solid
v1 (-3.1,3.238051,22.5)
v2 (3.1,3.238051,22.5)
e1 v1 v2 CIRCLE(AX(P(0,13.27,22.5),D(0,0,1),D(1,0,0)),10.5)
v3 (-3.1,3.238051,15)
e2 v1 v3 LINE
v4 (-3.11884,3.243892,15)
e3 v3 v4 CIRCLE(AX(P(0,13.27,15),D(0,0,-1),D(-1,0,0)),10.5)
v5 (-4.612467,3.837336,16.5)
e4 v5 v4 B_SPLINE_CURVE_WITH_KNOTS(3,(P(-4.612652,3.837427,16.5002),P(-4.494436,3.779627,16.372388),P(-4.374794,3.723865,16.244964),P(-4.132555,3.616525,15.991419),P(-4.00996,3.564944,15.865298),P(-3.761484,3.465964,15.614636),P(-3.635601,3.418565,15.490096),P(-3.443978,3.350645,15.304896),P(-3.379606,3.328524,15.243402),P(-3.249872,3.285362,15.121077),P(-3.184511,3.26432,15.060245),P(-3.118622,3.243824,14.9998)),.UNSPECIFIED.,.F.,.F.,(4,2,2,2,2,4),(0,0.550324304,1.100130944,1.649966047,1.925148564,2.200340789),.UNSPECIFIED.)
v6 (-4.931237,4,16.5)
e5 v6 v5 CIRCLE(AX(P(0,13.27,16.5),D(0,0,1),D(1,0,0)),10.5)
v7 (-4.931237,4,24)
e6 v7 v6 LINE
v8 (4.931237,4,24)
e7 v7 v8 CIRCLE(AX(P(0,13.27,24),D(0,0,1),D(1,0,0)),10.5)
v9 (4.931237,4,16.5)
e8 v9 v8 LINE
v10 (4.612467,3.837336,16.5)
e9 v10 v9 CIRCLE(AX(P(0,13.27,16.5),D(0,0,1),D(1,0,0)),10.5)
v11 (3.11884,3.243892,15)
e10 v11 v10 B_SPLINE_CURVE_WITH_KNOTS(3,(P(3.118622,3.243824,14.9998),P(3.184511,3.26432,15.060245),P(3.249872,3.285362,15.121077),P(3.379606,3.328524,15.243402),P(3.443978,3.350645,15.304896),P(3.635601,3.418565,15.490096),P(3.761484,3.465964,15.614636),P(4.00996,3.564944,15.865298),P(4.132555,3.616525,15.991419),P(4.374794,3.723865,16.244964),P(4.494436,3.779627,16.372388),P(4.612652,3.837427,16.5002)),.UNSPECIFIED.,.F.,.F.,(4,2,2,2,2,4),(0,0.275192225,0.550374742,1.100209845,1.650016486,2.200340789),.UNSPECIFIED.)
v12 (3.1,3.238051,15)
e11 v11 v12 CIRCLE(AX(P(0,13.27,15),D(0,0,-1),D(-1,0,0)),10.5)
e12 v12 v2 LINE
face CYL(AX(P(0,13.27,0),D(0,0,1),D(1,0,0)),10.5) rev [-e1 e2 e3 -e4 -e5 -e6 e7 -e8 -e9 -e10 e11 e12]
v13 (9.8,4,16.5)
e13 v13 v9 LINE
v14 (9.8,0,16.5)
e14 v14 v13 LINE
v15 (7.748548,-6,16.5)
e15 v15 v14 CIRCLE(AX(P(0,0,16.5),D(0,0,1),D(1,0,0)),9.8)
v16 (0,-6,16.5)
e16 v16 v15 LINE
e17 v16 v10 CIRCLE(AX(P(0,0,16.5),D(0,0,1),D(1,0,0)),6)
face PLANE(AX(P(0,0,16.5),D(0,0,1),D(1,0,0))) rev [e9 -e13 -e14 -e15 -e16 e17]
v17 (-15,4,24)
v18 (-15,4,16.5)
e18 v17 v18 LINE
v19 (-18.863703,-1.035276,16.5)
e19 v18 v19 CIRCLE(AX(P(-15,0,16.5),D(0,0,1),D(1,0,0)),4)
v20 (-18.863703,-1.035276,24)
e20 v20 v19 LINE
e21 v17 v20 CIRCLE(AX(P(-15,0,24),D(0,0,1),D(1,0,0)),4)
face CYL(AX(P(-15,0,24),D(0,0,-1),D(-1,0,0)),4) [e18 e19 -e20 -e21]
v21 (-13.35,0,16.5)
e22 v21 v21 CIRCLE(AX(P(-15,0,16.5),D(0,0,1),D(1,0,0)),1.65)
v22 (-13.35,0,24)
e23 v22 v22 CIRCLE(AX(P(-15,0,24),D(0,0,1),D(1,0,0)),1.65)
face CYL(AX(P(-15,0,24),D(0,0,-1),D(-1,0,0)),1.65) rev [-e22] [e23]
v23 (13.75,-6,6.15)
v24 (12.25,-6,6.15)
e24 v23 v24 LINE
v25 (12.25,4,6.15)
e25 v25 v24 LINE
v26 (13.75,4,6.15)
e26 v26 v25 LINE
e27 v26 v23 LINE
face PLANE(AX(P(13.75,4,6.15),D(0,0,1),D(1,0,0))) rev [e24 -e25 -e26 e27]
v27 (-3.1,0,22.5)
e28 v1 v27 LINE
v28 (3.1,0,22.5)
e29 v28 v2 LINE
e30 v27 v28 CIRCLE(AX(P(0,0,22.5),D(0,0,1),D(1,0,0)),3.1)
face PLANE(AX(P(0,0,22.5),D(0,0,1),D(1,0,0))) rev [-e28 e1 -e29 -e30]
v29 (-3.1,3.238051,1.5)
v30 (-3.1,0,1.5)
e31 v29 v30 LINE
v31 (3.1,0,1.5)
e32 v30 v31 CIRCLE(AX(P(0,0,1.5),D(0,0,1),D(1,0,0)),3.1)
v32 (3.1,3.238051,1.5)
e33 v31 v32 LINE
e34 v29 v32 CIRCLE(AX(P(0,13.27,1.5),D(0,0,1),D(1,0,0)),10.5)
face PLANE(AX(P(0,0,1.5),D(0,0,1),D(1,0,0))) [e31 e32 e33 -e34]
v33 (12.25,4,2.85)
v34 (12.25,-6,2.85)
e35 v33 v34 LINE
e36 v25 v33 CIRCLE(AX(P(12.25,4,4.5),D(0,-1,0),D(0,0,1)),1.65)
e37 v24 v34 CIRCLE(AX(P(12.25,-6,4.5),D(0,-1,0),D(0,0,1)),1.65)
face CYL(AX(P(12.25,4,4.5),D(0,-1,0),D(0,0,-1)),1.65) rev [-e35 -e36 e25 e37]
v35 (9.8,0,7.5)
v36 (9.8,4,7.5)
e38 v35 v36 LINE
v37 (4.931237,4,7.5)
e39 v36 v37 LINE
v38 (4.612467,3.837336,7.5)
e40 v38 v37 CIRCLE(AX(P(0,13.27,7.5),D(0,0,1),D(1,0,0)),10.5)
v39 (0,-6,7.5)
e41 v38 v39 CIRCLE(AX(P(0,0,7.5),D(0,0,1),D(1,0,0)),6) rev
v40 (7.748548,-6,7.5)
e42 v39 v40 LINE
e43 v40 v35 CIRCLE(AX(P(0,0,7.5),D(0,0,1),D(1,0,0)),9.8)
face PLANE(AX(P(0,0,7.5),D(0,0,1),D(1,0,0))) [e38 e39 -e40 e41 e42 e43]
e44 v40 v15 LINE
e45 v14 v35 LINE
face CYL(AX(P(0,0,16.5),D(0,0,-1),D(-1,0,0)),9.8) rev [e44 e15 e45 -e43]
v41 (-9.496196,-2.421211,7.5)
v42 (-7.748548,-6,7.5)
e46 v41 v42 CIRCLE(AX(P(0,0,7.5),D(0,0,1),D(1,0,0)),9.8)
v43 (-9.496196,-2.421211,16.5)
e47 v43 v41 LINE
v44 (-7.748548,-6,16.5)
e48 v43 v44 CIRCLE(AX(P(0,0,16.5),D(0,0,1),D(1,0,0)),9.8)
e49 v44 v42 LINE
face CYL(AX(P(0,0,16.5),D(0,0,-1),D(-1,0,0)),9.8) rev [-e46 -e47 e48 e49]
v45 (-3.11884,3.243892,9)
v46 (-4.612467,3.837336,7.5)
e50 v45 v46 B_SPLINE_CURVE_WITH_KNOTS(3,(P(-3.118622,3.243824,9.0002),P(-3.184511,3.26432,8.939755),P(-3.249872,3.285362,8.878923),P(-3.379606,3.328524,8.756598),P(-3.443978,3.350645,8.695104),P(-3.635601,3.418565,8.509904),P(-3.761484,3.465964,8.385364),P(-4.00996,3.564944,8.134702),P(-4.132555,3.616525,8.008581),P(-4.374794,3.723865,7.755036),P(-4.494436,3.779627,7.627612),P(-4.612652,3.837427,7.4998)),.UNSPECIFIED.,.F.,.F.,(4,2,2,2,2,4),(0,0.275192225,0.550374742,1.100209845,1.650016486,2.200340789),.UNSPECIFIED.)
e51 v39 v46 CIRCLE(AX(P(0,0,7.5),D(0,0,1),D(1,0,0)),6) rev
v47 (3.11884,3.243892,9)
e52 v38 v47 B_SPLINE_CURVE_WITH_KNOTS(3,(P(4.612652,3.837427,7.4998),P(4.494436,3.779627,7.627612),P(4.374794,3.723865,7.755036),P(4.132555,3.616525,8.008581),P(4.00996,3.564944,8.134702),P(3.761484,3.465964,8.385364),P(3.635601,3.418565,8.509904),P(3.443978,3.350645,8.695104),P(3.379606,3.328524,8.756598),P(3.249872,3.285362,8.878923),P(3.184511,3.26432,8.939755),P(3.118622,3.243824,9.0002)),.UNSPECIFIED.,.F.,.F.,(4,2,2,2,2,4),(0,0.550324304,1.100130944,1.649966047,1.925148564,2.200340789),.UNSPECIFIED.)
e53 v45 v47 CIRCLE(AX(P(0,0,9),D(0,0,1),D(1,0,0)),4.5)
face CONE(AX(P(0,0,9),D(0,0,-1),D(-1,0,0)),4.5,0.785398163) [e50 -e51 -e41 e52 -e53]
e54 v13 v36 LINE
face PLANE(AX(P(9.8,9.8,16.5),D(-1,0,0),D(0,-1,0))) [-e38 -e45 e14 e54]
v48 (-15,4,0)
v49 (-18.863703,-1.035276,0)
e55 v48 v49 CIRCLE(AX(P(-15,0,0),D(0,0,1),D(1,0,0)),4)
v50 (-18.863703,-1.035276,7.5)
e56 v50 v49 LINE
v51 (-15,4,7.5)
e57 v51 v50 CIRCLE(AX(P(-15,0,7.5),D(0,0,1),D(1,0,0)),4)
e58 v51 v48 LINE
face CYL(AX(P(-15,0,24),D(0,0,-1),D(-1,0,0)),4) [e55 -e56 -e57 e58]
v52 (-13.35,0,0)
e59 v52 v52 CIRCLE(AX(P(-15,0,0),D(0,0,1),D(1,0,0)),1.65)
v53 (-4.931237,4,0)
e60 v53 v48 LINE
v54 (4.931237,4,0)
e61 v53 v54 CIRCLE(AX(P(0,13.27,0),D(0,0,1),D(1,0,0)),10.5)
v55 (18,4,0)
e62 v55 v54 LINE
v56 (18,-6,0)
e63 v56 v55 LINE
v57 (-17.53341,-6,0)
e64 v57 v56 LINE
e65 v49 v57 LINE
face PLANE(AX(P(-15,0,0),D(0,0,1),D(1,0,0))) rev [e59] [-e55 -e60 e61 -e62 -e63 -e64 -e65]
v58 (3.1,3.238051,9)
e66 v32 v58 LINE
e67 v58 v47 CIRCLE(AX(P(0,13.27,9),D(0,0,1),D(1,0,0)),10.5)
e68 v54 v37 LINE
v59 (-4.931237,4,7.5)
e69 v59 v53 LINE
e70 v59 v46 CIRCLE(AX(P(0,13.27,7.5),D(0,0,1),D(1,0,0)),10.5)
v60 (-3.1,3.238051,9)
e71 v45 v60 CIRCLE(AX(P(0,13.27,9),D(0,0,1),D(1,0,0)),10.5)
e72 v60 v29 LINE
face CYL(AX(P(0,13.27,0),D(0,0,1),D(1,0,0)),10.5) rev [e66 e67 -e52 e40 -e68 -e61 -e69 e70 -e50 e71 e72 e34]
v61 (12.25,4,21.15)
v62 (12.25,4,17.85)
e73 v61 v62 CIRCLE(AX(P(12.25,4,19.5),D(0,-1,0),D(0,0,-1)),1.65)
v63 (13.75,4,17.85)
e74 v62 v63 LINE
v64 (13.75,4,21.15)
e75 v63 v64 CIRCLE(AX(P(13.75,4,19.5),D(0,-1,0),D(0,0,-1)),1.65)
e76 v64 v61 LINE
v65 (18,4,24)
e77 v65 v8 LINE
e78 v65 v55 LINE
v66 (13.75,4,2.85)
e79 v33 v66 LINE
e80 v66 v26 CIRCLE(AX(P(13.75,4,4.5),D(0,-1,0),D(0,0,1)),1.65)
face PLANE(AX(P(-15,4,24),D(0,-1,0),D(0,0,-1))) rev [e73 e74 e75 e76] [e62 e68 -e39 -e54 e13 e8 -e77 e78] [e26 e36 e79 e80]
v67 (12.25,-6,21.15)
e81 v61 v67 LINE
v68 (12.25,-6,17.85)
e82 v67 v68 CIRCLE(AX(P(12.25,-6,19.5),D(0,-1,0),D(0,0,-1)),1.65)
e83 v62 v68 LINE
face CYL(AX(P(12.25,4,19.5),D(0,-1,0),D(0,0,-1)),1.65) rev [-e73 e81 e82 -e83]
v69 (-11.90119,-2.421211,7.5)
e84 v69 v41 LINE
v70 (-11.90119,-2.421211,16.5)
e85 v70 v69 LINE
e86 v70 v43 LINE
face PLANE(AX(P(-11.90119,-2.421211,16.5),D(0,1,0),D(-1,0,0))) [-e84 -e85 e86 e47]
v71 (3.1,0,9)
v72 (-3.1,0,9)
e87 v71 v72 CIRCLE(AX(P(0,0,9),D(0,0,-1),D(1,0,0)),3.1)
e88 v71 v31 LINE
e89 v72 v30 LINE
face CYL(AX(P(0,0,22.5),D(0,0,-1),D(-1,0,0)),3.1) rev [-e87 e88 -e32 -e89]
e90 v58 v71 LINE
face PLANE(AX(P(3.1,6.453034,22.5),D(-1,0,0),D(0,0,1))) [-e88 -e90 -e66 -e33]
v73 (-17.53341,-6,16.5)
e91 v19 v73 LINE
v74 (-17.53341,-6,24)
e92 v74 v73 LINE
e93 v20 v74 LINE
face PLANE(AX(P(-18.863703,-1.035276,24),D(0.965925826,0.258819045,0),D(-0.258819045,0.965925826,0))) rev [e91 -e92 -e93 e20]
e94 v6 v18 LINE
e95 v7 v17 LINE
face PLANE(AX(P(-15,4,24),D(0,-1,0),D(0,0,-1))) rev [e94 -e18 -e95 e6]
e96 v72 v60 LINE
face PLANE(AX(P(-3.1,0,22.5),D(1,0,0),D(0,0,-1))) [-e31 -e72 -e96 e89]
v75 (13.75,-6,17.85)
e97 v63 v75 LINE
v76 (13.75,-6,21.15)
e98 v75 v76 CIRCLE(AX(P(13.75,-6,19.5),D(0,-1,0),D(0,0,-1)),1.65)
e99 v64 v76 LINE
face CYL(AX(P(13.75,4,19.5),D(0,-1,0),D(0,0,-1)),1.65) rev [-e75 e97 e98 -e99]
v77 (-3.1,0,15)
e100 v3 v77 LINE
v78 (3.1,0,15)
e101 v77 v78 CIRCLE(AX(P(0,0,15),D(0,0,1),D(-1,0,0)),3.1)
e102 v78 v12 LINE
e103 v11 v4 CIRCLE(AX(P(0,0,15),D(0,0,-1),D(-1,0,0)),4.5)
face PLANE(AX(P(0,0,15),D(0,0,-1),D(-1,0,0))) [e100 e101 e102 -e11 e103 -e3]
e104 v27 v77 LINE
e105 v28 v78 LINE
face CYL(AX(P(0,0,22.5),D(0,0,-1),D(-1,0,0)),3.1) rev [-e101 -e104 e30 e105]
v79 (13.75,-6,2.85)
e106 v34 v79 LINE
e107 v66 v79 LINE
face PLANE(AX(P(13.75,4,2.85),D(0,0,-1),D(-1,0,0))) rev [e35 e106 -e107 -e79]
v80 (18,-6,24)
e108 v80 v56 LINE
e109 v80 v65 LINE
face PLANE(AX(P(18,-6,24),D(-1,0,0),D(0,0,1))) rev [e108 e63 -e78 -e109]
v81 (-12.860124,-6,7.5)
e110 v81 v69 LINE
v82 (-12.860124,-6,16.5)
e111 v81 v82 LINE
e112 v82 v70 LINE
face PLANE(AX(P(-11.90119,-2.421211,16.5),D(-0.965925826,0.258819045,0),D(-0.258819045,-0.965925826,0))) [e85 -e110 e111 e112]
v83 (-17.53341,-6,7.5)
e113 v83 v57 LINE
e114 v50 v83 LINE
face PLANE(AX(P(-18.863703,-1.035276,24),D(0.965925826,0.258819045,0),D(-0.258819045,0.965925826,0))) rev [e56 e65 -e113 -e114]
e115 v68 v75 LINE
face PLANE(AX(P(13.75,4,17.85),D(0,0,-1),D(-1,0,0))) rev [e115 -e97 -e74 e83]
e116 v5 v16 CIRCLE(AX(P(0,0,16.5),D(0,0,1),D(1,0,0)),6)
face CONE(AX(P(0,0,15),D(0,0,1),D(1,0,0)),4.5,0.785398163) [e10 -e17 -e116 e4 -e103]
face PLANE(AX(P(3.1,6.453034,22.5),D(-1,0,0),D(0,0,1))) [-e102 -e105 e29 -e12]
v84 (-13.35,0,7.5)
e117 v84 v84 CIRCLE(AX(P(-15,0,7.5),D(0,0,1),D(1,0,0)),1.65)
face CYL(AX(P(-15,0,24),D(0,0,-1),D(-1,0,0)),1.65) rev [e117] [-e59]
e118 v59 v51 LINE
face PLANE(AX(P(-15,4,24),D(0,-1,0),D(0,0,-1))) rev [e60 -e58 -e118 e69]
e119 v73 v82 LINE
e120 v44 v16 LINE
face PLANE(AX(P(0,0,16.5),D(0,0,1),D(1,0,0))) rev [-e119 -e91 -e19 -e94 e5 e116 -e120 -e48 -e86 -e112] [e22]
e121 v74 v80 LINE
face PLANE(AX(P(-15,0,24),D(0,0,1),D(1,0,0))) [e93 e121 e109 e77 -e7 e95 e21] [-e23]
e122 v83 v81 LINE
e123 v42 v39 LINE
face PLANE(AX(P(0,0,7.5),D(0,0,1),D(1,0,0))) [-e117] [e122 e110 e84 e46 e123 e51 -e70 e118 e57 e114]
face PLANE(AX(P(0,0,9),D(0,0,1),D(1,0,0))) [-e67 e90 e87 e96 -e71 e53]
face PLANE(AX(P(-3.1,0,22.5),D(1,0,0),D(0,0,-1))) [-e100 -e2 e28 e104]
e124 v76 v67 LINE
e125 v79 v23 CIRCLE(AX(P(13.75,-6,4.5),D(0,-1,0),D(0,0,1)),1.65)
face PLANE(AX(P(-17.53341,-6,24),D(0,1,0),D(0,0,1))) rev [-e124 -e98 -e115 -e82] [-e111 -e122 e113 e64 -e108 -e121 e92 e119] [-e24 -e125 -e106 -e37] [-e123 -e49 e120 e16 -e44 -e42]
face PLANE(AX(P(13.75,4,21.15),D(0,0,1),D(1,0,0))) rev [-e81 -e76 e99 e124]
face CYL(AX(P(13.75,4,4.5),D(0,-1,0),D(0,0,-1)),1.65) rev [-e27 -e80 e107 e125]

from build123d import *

# Parameters (mm, degrees)
SKETCH1_R               = 1.65
BOSS_EXTRUDE1_DEPTH     = 24
CUT_EXTRUDE1_DEPTH      = 4.5
CUT_EXTRUDE1_DEPTH_BACK = 4.5
CUT_EXTRUDE3_DEPTH      = 10.5
CUT_EXTRUDE3_DEPTH_BACK = 10.5
CUT_EXTRUDE2_DEPTH      = 33.202484376
BOSS_EXTRUDE2_DEPTH     = 1.5
BOSS_EXTRUDE3_START     = 1.5
BOSS_EXTRUDE3_DEPTH     = 1.5
CHAMFER1_SIZE           = 1.5
SKETCH7_R               = 10.5
CUT_EXTRUDE4_DEPTH      = 32.192947921


with BuildPart() as part:
    # Sketch1 → Boss-Extrude1 (new body)
    with BuildSketch(Plane.XY):
        with BuildLine():
            Line((-18.863703305, -1.03527618), (-17.533409567, -6))
            Line((-17.533409567, -6), (18, -6))
            Line((18, -6), (18, 4))
            Line((18, 4), (-15, 4))
            ThreePointArc((-15, 4), (-18.173413361, 2.435045716), (-18.863703305, -1.03527618))
        make_face()
        with Locations((-15, 0)):
            Circle(SKETCH1_R, mode=Mode.SUBTRACT)
    extrude(amount=BOSS_EXTRUDE1_DEPTH)

    # Sketch2 → Cut-Extrude1 (cut, two sides: drawn at the far end of the back side and taken through both)
    with BuildSketch(Plane.XY.offset(12).offset(-CUT_EXTRUDE1_DEPTH_BACK)):
        with BuildLine():
            Line((-11.901189968, -2.421210935), (-19.809111658, -31.933976465))
            Line((-19.809111658, -31.933976465), (-19.809111658, 9.8))
            Line((-19.809111658, 9.8), (9.8, 9.8))
            Line((9.8, 9.8), (9.8, 0))
            ThreePointArc((9.8, 0), (1.220098284, -9.723752371), (-9.496195955, -2.421210935))
            Line((-9.496195955, -2.421210935), (-11.901189968, -2.421210935))
        make_face()
    extrude(amount=CUT_EXTRUDE1_DEPTH + CUT_EXTRUDE1_DEPTH_BACK, mode=Mode.SUBTRACT)

    # Sketch4 → Cut-Extrude3 (cut, two sides: drawn at the far end of the back side and taken through both)
    with BuildSketch(Plane.XY.offset(12).offset(-CUT_EXTRUDE3_DEPTH_BACK)):
        with BuildLine():
            Line((-3.1, 0), (-3.1, 6.453034263))
            Line((-3.1, 6.453034263), (3.1, 6.453034263))
            Line((3.1, 6.453034263), (3.1, 0))
            ThreePointArc((3.1, 0), (0, -3.1), (-3.1, 0))
        make_face()
    extrude(amount=CUT_EXTRUDE3_DEPTH + CUT_EXTRUDE3_DEPTH_BACK, mode=Mode.SUBTRACT)

    # Sketch3 → Cut-Extrude2 (cut, through all)
    with BuildSketch(Plane.XZ.offset(6)):
        with BuildLine():
            Line((13.75, 17.85), (12.25, 17.85))
            ThreePointArc((12.25, 17.85), (10.6, 19.5), (12.25, 21.15))
            Line((12.25, 21.15), (13.75, 21.15))
            ThreePointArc((13.75, 21.15), (15.4, 19.5), (13.75, 17.85))
        make_face()
        with BuildLine():
            Line((13.75, 6.15), (12.25, 6.15))
            ThreePointArc((12.25, 6.15), (10.6, 4.5), (12.25, 2.85))
            Line((12.25, 2.85), (13.75, 2.85))
            ThreePointArc((13.75, 2.85), (15.4, 4.5), (13.75, 6.15))
        make_face()
    extrude(amount=-CUT_EXTRUDE2_DEPTH, mode=Mode.SUBTRACT)

    # Sketch5 → Boss-Extrude2 (add)
    with BuildSketch(Plane.XY.offset(7.5)):
        with BuildLine():
            Line((-3.1, 0), (-3.1, 3.261901286))
            ThreePointArc((-3.1, 3.261901286), (0, -4.5), (3.1, 3.261901286))
            Line((3.1, 3.261901286), (3.1, 0))
            ThreePointArc((3.1, 0), (0, -3.1), (-3.1, 0))
        make_face()
    extrude(amount=BOSS_EXTRUDE2_DEPTH)

    # Sketch6 → Boss-Extrude3 (add)
    with BuildSketch(Plane(origin=(0, 0, 16.5), x_dir=(-1, 0, 0), z_dir=(0, 0, -1)).offset(BOSS_EXTRUDE3_START)):
        with BuildLine():
            Line((-3.1, 0), (-3.1, 3.261901286))
            ThreePointArc((-3.1, 3.261901286), (0, -4.5), (3.1, 3.261901286))
            Line((3.1, 3.261901286), (3.1, 0))
            ThreePointArc((3.1, 0), (0, -3.1), (-3.1, 0))
        make_face()
    extrude(amount=-BOSS_EXTRUDE3_DEPTH)

    # Chamfer1
    chamfer1_edges = [part.edges().sort_by_distance(p)[0] for p in [
        (0, -4.5, 7.5),
        (0, -4.5, 16.5),
    ]]
    chamfer(chamfer1_edges, length=CHAMFER1_SIZE - 0.0001)  # a hair under: the kernel refuses the full size

    # Sketch7 → Cut-Extrude4 (cut, through all)
    with BuildSketch(Plane.XY.offset(24)):
        with Locations((0, 13.27)):
            Circle(SKETCH7_R)
    extrude(amount=-CUT_EXTRUDE4_DEPTH, mode=Mode.SUBTRACT)


solid = part.part
